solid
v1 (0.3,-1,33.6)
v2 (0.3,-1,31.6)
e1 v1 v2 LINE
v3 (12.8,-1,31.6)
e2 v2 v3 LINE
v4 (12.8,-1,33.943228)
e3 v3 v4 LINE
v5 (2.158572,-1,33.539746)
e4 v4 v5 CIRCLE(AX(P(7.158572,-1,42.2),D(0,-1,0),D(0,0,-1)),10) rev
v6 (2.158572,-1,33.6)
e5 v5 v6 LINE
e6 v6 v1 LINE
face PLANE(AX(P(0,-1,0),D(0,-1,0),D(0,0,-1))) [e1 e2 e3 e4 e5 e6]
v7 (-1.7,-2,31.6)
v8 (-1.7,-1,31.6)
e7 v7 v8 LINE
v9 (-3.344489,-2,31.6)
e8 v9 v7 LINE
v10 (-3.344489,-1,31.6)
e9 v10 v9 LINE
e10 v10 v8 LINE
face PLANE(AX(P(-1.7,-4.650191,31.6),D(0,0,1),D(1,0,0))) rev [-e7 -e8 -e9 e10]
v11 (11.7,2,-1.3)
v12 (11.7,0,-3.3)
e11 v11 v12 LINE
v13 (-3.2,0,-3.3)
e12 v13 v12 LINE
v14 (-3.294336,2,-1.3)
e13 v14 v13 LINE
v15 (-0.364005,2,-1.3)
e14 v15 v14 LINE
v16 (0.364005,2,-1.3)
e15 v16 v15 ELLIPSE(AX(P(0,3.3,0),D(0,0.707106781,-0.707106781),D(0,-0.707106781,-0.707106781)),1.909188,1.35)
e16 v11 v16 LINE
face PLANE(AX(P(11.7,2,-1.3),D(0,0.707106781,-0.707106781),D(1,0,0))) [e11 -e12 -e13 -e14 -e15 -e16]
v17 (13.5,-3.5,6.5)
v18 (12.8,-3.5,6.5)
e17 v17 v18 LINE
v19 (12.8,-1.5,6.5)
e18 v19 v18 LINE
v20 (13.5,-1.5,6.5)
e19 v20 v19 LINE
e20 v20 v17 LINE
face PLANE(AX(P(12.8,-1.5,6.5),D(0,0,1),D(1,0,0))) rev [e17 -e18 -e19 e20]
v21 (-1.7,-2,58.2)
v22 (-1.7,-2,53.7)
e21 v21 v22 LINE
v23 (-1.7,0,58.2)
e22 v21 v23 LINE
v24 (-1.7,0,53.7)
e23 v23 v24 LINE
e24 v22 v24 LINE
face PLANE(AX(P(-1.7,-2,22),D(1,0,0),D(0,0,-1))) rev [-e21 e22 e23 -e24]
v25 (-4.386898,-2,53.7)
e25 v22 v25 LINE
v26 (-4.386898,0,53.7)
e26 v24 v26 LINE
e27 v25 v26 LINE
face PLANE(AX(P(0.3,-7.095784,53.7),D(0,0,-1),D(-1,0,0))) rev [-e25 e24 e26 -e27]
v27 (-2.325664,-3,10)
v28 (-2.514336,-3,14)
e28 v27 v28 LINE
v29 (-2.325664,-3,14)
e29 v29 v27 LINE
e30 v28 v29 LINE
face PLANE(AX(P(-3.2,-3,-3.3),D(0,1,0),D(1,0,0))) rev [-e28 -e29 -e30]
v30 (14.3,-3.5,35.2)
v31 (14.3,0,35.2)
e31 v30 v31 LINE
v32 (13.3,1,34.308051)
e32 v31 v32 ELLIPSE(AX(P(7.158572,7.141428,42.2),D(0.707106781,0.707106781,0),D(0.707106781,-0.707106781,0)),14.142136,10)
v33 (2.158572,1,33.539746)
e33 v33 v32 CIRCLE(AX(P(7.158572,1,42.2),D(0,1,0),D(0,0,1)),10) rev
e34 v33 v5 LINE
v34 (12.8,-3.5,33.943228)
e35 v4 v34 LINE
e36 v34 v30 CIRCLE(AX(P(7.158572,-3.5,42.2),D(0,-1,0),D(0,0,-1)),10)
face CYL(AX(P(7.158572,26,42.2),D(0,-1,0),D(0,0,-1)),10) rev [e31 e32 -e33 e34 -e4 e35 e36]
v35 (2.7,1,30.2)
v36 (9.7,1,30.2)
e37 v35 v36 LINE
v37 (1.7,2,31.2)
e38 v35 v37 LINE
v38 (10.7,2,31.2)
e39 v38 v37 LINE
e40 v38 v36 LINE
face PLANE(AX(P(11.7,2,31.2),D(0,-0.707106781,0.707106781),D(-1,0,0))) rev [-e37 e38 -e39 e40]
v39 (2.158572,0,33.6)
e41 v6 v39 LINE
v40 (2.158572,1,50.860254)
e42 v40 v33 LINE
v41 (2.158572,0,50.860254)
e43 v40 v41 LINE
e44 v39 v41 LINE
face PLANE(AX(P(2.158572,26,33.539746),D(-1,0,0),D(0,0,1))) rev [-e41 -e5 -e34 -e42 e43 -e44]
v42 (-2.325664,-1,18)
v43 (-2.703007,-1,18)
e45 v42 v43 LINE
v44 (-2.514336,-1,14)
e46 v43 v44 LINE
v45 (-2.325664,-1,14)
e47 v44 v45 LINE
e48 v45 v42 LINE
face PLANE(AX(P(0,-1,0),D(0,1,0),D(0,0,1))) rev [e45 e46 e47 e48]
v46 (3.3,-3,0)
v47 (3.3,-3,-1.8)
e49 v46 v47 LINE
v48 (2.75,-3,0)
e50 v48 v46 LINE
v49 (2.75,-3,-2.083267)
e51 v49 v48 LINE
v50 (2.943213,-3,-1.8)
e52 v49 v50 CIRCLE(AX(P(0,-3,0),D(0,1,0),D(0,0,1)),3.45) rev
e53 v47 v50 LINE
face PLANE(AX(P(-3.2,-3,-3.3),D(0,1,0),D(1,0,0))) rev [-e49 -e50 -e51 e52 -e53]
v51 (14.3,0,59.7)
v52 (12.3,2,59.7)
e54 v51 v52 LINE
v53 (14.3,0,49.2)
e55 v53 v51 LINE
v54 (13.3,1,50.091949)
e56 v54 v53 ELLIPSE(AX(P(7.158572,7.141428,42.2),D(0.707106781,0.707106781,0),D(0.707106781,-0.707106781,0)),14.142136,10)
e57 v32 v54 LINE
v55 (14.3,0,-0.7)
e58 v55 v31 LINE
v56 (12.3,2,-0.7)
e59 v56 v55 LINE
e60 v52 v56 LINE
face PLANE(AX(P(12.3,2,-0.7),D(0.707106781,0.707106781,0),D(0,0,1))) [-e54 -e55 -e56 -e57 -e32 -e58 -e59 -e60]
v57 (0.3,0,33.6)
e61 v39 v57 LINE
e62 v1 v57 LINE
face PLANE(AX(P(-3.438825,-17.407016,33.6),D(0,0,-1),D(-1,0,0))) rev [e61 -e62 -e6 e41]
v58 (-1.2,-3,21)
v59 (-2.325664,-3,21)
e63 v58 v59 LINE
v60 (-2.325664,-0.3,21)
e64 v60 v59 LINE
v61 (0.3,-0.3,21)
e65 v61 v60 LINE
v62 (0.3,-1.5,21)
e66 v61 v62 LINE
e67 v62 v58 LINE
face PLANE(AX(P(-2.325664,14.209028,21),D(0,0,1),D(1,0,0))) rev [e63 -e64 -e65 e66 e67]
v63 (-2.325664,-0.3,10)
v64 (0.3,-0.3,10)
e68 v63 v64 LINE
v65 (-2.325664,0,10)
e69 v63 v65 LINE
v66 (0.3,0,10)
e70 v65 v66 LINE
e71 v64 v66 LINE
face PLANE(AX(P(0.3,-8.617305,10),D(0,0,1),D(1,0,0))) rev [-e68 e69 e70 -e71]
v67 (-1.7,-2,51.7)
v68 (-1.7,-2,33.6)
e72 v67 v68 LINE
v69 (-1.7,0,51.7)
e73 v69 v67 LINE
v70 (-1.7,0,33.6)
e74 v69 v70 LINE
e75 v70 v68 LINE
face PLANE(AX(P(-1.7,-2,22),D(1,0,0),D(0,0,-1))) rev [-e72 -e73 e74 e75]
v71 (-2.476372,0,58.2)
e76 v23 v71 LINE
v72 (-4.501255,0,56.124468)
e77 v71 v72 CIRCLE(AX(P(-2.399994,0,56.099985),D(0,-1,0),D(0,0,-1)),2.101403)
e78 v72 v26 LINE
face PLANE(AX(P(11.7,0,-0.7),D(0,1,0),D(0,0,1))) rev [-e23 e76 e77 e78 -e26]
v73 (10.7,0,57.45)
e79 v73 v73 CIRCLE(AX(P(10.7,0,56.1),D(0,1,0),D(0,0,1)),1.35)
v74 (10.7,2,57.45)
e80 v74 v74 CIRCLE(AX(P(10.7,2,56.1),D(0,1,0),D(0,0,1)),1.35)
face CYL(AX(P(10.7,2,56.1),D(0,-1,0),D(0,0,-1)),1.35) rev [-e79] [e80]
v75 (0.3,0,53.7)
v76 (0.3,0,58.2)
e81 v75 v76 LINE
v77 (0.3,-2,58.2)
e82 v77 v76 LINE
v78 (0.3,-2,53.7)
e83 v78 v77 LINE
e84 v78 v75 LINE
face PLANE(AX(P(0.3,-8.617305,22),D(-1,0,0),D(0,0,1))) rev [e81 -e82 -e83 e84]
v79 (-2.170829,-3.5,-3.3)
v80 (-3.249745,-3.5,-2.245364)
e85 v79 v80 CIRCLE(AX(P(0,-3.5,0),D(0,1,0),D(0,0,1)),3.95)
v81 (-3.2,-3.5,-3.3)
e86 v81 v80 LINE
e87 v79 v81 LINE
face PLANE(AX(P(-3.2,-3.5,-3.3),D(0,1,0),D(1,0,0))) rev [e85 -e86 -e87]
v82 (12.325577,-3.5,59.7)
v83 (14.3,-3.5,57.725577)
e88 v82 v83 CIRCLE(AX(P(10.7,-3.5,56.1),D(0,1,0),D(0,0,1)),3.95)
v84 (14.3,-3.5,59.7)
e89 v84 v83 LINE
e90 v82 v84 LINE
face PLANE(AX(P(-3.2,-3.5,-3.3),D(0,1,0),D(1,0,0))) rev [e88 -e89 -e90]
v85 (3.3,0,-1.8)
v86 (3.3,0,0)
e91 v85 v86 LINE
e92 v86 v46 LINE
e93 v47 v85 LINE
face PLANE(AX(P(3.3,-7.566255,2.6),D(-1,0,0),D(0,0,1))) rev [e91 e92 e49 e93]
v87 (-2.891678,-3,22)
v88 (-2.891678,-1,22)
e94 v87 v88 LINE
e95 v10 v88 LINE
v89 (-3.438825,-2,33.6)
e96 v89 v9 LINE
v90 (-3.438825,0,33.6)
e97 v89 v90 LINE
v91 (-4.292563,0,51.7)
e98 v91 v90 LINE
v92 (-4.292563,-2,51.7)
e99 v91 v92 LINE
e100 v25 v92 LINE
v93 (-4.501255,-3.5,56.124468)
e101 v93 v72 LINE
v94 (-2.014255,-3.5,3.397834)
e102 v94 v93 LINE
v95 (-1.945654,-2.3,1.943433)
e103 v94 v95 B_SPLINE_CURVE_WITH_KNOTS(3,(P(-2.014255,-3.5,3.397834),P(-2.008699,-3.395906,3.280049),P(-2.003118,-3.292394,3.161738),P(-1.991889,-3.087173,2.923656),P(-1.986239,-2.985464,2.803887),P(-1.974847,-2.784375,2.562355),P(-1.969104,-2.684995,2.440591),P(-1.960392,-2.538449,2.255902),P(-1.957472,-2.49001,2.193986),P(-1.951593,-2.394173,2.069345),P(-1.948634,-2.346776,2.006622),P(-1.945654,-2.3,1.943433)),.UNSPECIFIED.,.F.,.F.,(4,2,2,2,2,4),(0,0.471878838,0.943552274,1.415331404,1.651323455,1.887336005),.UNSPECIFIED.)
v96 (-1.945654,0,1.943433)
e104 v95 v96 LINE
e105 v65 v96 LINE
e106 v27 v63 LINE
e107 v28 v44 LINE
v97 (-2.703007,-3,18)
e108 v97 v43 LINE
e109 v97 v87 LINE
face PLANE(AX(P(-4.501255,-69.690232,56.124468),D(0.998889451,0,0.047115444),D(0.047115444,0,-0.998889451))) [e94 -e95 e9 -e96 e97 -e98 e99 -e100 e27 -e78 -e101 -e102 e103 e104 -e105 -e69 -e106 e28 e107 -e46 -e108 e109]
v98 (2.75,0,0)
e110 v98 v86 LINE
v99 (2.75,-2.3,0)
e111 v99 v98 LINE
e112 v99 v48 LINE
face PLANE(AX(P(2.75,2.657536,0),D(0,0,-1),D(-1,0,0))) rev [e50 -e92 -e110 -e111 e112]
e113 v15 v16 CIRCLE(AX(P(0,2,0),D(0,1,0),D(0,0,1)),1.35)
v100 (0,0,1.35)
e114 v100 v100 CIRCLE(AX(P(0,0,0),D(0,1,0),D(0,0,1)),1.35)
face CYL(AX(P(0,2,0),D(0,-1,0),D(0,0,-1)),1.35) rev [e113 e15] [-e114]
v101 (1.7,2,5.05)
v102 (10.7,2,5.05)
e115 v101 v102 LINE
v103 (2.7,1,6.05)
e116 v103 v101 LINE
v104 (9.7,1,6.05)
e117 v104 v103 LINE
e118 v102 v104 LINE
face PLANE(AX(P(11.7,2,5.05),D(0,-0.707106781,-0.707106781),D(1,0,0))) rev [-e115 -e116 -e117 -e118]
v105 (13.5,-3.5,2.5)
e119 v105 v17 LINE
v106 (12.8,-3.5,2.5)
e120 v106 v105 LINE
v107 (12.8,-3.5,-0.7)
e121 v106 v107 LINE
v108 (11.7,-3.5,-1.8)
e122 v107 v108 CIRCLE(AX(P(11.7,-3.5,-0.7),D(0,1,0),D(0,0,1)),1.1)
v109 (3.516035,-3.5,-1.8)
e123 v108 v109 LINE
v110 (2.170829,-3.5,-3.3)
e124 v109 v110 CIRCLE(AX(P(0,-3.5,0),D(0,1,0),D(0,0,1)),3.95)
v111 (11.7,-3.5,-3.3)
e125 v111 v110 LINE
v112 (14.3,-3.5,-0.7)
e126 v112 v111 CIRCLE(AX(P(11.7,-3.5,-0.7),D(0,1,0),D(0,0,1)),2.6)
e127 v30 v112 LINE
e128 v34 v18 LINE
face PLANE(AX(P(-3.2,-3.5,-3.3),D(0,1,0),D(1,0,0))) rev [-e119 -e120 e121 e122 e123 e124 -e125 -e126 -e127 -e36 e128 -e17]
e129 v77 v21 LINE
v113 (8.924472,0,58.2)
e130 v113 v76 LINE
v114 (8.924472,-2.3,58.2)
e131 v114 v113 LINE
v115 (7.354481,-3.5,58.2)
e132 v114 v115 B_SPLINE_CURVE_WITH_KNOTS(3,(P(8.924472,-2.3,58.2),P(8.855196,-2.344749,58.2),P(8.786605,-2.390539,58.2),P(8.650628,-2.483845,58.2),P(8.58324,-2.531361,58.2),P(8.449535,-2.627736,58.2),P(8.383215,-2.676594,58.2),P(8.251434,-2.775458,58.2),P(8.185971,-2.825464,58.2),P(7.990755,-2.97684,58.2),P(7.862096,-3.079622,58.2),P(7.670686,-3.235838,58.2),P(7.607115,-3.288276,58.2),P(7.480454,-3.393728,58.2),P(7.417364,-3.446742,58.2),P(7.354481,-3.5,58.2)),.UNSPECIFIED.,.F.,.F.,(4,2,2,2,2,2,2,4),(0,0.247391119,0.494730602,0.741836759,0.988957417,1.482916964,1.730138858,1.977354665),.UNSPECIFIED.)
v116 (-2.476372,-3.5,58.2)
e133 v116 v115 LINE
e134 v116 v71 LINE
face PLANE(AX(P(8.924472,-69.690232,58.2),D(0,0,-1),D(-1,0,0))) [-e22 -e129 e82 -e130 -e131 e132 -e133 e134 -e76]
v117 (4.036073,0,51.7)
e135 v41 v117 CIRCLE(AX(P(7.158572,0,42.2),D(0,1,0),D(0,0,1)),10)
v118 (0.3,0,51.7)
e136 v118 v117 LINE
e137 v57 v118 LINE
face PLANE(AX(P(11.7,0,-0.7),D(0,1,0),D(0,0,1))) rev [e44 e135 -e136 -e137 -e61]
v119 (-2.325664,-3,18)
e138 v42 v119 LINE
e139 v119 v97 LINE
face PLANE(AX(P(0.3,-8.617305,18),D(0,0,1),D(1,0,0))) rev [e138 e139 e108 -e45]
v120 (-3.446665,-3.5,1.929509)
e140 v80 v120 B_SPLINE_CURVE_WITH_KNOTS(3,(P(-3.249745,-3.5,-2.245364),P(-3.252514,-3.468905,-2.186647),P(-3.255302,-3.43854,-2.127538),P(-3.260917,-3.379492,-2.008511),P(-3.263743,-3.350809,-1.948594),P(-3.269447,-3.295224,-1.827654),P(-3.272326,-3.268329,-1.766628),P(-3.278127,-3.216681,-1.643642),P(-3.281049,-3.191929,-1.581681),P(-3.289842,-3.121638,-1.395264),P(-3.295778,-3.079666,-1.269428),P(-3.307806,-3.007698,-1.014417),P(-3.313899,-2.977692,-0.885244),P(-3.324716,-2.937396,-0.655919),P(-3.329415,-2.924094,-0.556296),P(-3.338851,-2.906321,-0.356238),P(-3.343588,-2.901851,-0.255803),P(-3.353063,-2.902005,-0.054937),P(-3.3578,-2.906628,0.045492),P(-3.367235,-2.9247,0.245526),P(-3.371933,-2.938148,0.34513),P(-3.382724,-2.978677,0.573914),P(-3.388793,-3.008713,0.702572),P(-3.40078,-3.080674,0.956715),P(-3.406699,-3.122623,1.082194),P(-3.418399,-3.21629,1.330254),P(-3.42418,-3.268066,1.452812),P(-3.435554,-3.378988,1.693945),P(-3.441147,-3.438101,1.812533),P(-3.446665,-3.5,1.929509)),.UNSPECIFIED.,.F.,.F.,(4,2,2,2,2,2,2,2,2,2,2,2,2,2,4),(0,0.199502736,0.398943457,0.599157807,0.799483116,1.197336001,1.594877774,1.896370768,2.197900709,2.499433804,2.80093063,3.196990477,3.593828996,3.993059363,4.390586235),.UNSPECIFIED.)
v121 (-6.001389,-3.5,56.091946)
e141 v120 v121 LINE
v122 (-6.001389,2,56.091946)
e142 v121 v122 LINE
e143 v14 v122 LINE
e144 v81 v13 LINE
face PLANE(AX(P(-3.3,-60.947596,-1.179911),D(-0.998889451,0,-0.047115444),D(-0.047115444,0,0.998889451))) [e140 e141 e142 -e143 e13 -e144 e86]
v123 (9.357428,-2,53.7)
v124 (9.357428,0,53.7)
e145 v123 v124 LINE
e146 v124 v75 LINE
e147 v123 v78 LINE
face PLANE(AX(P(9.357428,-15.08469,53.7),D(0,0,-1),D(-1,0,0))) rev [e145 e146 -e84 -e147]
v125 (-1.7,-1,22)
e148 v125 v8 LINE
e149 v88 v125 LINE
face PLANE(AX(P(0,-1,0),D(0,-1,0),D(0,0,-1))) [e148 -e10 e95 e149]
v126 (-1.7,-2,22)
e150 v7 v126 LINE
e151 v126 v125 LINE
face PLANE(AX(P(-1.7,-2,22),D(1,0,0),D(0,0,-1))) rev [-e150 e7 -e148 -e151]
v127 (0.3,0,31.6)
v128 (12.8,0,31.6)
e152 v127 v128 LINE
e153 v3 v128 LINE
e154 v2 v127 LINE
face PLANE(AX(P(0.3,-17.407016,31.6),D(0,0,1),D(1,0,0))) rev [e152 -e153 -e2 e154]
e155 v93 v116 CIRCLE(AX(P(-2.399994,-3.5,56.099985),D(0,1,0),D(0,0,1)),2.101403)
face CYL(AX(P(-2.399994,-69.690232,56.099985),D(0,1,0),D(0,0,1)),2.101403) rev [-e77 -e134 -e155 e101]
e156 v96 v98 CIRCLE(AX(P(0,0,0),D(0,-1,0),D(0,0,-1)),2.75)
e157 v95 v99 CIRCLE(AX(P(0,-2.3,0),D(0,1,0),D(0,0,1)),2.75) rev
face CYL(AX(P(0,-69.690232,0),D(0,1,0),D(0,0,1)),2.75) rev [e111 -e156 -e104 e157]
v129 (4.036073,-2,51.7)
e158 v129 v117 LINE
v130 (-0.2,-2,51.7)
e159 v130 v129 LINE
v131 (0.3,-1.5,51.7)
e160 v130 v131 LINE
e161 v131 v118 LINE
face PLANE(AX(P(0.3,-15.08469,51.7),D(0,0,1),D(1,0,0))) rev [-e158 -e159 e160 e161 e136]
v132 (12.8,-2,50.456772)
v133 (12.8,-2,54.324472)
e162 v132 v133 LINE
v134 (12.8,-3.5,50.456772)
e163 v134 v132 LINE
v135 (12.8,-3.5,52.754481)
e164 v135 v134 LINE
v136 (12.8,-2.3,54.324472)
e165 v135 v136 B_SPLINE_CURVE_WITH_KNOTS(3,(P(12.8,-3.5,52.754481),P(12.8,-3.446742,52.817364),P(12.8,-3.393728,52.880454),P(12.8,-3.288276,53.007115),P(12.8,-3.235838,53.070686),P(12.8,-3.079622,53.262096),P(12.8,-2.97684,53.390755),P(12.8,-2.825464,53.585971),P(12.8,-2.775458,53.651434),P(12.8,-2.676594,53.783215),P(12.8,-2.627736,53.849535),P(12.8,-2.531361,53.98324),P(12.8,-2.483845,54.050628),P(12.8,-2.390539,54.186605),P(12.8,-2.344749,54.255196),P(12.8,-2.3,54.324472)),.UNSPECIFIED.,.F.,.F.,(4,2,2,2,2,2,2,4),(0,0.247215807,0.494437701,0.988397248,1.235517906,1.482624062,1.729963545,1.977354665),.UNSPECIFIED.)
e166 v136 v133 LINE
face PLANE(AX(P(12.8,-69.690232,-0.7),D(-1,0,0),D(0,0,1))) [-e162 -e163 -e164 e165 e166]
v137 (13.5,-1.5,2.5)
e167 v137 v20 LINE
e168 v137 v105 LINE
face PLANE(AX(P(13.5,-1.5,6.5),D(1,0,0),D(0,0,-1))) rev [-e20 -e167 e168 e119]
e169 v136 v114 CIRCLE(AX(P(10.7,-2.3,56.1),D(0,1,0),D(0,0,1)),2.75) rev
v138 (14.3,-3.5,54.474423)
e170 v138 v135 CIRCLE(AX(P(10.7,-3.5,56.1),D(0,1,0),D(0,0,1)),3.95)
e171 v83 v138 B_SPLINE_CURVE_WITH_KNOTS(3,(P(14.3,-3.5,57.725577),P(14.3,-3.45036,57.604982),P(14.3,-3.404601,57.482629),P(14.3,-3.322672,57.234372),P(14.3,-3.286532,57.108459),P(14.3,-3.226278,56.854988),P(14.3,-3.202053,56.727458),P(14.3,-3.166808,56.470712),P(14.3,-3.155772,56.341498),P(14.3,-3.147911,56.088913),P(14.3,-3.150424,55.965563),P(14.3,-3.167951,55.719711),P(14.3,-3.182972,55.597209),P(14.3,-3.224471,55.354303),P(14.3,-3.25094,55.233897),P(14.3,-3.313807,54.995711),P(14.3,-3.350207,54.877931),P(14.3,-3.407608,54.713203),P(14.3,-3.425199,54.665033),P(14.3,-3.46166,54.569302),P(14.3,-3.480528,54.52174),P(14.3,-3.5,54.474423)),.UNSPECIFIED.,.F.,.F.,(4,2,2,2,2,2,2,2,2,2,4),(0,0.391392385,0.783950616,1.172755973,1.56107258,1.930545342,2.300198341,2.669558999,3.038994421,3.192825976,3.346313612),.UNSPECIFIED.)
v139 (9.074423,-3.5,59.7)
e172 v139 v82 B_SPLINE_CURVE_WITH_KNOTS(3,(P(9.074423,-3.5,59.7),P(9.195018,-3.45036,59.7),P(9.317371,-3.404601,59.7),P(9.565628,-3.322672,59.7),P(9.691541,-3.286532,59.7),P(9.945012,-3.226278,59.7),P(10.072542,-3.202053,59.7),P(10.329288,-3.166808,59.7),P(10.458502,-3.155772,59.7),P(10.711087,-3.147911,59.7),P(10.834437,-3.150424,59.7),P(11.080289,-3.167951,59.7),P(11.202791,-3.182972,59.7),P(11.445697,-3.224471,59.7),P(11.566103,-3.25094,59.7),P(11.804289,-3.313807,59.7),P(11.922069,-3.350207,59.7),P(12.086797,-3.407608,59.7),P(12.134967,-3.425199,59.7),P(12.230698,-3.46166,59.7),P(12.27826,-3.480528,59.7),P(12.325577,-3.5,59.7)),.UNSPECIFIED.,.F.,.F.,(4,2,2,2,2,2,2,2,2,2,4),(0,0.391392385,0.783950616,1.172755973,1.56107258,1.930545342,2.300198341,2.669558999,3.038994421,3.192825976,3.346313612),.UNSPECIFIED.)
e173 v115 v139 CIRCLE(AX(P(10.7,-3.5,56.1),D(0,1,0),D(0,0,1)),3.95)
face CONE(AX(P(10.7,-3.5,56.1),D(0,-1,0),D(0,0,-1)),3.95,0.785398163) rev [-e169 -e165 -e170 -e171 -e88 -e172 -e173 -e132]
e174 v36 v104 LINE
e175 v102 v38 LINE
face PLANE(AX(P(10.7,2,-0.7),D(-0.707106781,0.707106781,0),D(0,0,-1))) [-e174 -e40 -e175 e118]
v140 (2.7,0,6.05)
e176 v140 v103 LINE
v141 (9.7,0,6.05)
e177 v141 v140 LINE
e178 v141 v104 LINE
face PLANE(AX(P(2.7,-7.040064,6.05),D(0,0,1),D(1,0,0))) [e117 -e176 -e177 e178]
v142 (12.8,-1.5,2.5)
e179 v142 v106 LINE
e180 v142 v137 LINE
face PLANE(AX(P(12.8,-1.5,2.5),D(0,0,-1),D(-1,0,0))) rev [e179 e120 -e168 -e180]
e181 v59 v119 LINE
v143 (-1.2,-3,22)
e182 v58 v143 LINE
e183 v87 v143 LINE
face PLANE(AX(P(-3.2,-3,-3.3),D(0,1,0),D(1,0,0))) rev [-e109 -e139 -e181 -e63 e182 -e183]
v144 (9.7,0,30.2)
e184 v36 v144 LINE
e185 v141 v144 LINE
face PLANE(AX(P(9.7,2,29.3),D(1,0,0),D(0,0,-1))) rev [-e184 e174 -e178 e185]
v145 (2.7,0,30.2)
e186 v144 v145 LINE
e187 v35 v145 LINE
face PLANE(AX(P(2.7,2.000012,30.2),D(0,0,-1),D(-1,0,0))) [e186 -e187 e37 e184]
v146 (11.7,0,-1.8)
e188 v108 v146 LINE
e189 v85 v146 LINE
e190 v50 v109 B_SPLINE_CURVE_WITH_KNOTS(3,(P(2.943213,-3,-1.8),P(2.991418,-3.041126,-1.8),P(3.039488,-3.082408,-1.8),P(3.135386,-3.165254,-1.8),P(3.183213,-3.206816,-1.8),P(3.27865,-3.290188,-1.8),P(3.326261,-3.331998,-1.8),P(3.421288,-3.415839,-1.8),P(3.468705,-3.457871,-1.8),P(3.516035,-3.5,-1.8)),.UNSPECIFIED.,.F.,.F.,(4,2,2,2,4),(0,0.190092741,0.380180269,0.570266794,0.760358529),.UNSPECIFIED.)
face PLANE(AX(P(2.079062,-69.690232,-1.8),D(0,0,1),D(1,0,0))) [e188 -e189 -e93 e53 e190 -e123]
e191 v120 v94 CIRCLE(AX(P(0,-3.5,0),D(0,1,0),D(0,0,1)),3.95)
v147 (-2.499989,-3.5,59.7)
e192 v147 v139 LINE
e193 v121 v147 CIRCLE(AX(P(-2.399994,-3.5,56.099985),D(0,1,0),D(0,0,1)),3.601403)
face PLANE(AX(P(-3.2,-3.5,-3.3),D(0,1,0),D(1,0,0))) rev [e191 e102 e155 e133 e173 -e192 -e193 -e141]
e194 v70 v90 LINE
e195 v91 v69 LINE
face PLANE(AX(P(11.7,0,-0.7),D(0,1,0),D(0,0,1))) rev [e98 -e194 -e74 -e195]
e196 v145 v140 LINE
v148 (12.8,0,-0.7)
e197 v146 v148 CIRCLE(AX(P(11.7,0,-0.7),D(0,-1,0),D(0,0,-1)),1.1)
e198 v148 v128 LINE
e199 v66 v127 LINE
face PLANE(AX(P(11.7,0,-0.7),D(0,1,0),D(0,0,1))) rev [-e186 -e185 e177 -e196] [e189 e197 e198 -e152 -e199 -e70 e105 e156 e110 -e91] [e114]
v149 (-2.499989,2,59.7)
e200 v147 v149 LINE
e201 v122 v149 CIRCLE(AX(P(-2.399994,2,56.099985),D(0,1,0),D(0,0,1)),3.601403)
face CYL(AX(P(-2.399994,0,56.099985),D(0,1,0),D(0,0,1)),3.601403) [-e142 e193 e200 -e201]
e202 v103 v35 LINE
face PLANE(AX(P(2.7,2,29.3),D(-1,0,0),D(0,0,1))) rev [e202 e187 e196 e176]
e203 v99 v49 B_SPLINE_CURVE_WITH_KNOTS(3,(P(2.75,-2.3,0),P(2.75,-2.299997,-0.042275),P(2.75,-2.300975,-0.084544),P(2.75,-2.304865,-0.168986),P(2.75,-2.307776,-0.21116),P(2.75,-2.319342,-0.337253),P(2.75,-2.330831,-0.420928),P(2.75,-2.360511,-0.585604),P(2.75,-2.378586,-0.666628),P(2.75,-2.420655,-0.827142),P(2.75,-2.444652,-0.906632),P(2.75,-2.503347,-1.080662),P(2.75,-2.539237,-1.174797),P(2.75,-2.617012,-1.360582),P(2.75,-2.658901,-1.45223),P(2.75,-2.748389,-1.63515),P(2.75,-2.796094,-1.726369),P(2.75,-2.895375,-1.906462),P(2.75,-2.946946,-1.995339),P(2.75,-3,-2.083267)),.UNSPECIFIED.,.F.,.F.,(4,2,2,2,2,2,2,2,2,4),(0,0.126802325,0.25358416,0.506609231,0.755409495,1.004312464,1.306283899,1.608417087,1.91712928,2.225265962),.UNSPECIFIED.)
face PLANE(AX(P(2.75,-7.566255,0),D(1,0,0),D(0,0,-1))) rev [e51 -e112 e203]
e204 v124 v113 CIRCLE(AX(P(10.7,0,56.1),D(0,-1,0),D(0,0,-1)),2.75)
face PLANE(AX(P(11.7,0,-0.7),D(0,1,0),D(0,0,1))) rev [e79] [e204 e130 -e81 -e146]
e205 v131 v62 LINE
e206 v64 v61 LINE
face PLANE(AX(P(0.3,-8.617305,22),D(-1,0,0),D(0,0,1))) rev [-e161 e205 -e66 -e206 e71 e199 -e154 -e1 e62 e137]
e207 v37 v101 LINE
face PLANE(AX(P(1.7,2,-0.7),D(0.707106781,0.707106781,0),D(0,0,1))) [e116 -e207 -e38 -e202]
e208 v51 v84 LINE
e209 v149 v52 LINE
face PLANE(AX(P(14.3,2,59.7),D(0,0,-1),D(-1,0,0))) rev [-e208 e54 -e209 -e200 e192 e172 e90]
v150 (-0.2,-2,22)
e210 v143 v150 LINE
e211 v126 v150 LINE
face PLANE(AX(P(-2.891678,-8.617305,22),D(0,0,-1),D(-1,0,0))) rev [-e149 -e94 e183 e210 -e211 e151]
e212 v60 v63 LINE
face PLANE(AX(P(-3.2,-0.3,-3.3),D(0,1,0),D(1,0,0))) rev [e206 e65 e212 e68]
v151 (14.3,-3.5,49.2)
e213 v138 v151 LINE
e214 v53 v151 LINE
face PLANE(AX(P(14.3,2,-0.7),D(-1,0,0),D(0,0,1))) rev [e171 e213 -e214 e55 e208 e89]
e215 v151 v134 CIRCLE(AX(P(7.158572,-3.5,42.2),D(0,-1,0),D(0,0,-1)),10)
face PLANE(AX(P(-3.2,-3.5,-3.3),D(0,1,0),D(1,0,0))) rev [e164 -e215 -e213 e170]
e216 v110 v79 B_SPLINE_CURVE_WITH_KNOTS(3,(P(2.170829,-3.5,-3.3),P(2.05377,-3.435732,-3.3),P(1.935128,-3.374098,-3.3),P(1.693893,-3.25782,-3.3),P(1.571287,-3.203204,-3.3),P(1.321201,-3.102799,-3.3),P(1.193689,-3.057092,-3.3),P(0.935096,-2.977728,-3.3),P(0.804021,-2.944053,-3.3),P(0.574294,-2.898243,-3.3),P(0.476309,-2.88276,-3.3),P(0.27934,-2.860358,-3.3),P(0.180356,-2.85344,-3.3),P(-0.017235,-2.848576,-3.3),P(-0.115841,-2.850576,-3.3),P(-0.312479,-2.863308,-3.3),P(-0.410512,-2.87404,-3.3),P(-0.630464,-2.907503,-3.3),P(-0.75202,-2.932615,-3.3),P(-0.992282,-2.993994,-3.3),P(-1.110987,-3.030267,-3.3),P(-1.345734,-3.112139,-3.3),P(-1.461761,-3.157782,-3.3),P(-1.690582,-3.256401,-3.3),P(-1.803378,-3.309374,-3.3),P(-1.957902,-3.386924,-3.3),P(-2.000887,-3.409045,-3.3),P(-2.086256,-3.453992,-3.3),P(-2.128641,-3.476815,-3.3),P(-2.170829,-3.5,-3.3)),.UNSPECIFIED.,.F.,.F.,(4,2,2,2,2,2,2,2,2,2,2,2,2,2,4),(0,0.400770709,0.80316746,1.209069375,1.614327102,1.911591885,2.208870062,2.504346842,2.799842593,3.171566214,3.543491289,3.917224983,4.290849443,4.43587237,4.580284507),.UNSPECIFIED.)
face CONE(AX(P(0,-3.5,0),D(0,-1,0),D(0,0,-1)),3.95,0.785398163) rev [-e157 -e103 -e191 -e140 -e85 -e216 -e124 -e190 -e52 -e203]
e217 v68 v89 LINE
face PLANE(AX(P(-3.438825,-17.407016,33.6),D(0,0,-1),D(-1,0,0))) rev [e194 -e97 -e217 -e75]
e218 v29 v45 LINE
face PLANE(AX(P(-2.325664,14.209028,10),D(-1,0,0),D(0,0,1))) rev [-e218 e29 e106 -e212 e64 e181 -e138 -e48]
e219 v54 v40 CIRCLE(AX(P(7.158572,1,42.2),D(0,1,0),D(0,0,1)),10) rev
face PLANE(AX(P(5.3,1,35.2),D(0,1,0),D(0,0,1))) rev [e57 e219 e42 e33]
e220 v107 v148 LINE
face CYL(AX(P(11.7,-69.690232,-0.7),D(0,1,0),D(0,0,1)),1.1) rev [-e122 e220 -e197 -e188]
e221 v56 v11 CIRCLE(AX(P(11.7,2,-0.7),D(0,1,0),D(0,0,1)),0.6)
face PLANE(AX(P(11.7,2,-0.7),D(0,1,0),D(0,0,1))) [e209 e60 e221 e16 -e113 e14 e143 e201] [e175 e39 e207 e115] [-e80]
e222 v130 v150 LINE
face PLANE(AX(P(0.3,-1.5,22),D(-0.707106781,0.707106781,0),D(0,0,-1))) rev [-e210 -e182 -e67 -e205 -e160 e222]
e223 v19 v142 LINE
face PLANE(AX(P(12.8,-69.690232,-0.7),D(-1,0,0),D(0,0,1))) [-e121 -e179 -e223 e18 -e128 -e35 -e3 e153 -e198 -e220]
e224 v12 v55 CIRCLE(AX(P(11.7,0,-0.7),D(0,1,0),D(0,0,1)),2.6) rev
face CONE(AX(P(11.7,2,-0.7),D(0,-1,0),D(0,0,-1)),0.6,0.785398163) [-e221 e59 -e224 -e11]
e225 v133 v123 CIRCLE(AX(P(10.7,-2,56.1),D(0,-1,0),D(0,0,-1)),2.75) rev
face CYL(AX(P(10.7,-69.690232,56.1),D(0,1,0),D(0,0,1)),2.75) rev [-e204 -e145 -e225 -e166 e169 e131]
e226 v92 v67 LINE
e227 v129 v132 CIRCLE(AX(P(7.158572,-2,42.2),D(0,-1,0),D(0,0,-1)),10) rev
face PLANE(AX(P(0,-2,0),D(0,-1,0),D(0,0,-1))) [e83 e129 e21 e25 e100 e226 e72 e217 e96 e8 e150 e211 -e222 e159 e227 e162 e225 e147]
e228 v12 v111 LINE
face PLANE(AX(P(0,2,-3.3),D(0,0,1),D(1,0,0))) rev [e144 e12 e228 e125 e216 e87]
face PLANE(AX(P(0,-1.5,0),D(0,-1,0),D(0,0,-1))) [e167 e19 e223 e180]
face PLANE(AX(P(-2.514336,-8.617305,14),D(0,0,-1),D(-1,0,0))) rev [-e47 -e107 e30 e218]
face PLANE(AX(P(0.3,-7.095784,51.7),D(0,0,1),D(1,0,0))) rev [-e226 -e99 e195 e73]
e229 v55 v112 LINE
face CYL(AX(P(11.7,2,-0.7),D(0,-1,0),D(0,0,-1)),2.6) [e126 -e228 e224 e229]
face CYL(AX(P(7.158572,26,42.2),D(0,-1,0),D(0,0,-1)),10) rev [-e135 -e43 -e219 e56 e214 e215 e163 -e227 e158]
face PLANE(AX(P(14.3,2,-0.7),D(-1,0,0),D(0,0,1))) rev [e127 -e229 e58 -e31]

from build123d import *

# Parameters (mm, degrees)
SKETCH_1_R                      = 1.35
EXTRUDE_1_DEPTH                 = 2
EXTRUDE_2_DEPTH                 = 2
CUT_EXTRUDE_1_DEPTH             = 62.421331799
CUT_EXTRUDE_1_DEPTH_BACK        = 62.421331799
EXTRUDE_START                   = 3.5
EXTRUDE_3_DEPTH                 = 3.5
SKETCH_5_W                      = 14
SKETCH_5_H                      = 4.5
CUT_EXTRUDE_2_DEPTH             = 9
CUT_EXTRUDE_3_REACH             = 63.635
SKETCH_7_W                      = 7
SKETCH_7_H                      = 24
CUT_EXTRUDE_4_DEPTH             = 62.488454201
EXTRUDE_4_DEPTH                 = 3
EXTRUDE_START_2                 = 3
EXTRUDE_5_DEPTH                 = 3
CHAMFER_2_SIZE                  = 1.5
EXTRUDE_6_DEPTH                 = 1
EXTRUDE_START_3                 = 1
EXTRUDE_7_DEPTH                 = 1
CHAMFER_3_SIZE                  = 1.2
CUT_EXTRUDE_6_REACH             = 63.635
SKETCH_13_W                     = 7
SKETCH_13_H                     = 0.9
CUT_EXTRUDE_6_DIRECTION_2_DEPTH = 62.634649346
SKETCH_14_W                     = 7
SKETCH_14_H                     = 0.75
EXTRUDE_8_DEPTH                 = 2
CHAMFER_1_SIZE                  = 1
SKETCH_15_W                     = 2.625664416
SKETCH_15_H                     = 11
CUT_EXTRUDE_7_DEPTH             = 2.7
CUT_EXTRUDE_START               = -3
SKETCH_16_W                     = 0.55
SKETCH_16_H                     = 2.6
CUT_EXTRUDE_8_DEPTH             = 3
SKETCH_17_W                     = 0.7
SKETCH_17_H                     = 4
CUT_EXTRUDE_9_DEPTH             = 2
SKETCH_18_W                     = 2
SKETCH_18_H                     = 36.2
EXTRUDE_9_DEPTH                 = 2
EXTRUDE_START_4                 = 2
EXTRUDE_10_DEPTH                = 2
SKETCH_20_W                     = 4.68689843
SKETCH_20_H                     = 2
EXTRUDE_11_DEPTH                = 2
SKETCH_21_W                     = 1.738825119
SKETCH_21_H                     = 2
EXTRUDE_12_DEPTH                = 1
CUT_EXTRUDE_10_DEPTH            = 29.7
CHAMFER_4_SIZE                  = 2


with BuildPart() as part:
    # 草图1 → 凸台-拉伸1 (new body)
    with BuildSketch(Plane(origin=(0, 0, 0), x_dir=(1, 0, 0), z_dir=(0, 1, 0))):
        with BuildLine():
            Line((0, 3.3), (11.7, 3.3))
            ThreePointArc((11.7, 3.3), (13.538477631, 2.538477631), (14.3, 0.7))
            Line((14.3, 0.7), (14.3, -59.7))
            Line((14.3, -59.7), (-3.3, -59.7))
            Line((-3.3, -59.7), (-3.3, 0))
            Line((-3.3, 0), (-3.3, 3.3))
            Line((-3.3, 3.3), (0, 3.3))
        make_face()
        with Locations(Location((0, 0, 0), (0, 0, 270))):
            Circle(SKETCH_1_R, mode=Mode.SUBTRACT)
        with Locations(Location((10.7, -56.1, 0), (0, 0, 270))):
            Circle(SKETCH_1_R, mode=Mode.SUBTRACT)
    extrude(amount=EXTRUDE_1_DEPTH)

    # 草图2 → 凸台-拉伸2 (add)
    with BuildSketch(Plane(origin=(0, 2, 0), x_dir=(1, 0, 0), z_dir=(0, 1, 0))):
        Polygon((-3.3, 1.179910787), (-6.171573065, -59.7), (-3.3, -59.7), align=None)
    extrude(amount=-EXTRUDE_2_DEPTH)

    # 草图3 → 切除-拉伸1 (cut, two sides: drawn at the far end of the back side and taken through both)
    with BuildSketch(Plane(origin=(0, 2, 0), x_dir=(1, 0, 0), z_dir=(0, 1, 0)).offset(-CUT_EXTRUDE_1_DEPTH_BACK)):
        Polygon((-3.3, 3.3), (-3.3, 1.179910787), (-3.2, 3.3), align=None)
        with BuildLine():
            ThreePointArc((-2.499988961, -59.7), (-4.984483511, -58.608076588), (-6.001389, -56.091946))
            Line((-6.001389, -56.091946), (-6.171573065, -59.7))
            Line((-6.171573065, -59.7), (-2.499988961, -59.7))
        make_face()
    extrude(amount=CUT_EXTRUDE_1_DEPTH + CUT_EXTRUDE_1_DEPTH_BACK, mode=Mode.SUBTRACT)

    # 草图4 → 凸台-拉伸3 (add)
    with BuildSketch(Plane.XZ.offset(EXTRUDE_START)):
        with BuildLine():
            Line((-6.001389, 56.091946), (-3.2, -3.3))
            Line((-3.2, -3.3), (11.7, -3.3))
            ThreePointArc((11.7, -3.3), (13.538477631, -2.538477631), (14.3, -0.7))
            Line((14.3, -0.7), (14.3, 59.7))
            Line((14.3, 59.7), (-2.499988961, 59.7))
            ThreePointArc((-2.499988961, 59.7), (-4.984483511, 58.608076588), (-6.001389, 56.091946))
        make_face()
        with BuildLine():
            Line((12.8, -0.7), (12.8, 54.32447191))
            ThreePointArc((12.8, 54.32447191), (12.644543648, 58.044543648), (8.92447191, 58.2))
            Line((8.92447191, 58.2), (-2.476371899, 58.2))
            ThreePointArc((-2.476371899, 58.2), (-3.904150356, 57.567435732), (-4.501255338, 56.124468472))
            Line((-4.501255338, 56.124468472), (-1.945653662, 1.943433001))
            ThreePointArc((-1.945653662, 1.943433001), (-1.872904729, -2.013635488), (2.079062289, -1.8))
            Line((2.079062289, -1.8), (11.7, -1.8))
            ThreePointArc((11.7, -1.8), (12.477817459, -1.477817459), (12.8, -0.7))
        make_face(mode=Mode.SUBTRACT)
    extrude(amount=-EXTRUDE_3_DEPTH)

    # 草图5 → 切除-拉伸2 (cut)
    with BuildSketch(Plane(origin=(14.3, 0, 0), x_dir=(0, 0, -1), z_dir=(1, 0, 0))):
        with Locations((-42.2, -1.25)):
            Rectangle(SKETCH_5_W, SKETCH_5_H)
    extrude(amount=-CUT_EXTRUDE_2_DEPTH, mode=Mode.SUBTRACT)

    # 切除-拉伸3: up to this face of the body (flat: up to its plane)
    cut_extrude_3_end = Plane(part.part.faces().sort_by_distance((9.8, 1, 42.2))[0])
    # 草图6 → 切除-拉伸3 (cut, up to the picked face)
    with BuildSketch(Plane.XZ.offset(3.5), mode=Mode.PRIVATE) as cut_extrude_3_sk1:
        with BuildLine():
            Line((2.158571571, 33.539745962), (2.158571571, 50.860254038))
            ThreePointArc((2.158571571, 50.860254038), (17.158571571, 42.2), (2.158571571, 33.539745962))
        make_face()
    cut_extrude_3_tool1 = split(extrude(cut_extrude_3_sk1.sketch, amount=-CUT_EXTRUDE_3_REACH, mode=Mode.PRIVATE), bisect_by=cut_extrude_3_end, keep=Keep.BOTH, mode=Mode.PRIVATE)
    add(cut_extrude_3_tool1.solids().sort_by(Axis((8.87184, -3.5, 42.2), (0, 1, 0)))[0], mode=Mode.SUBTRACT)

    # 草图7 → 切除-拉伸4 (cut, through all)
    with BuildSketch(Plane.XZ):
        with Locations((6.2, 17.3)):
            Rectangle(SKETCH_7_W, SKETCH_7_H)
    extrude(amount=-CUT_EXTRUDE_4_DEPTH, mode=Mode.SUBTRACT)

    # 草图8 → 凸台-拉伸4 (add)
    with BuildSketch(Plane.XZ):
        Polygon((-2.891678333, 22), (0.3, 22), (0.3, 18), (-2.703007027, 18), align=None)
        Polygon((-2.514335721, 14), (0.3, 14), (0.3, 10), (-2.325664416, 10), align=None)
    extrude(amount=EXTRUDE_4_DEPTH)

    # 草图9 → 凸台-拉伸5 (add)
    with BuildSketch(Plane.XZ.offset(EXTRUDE_START_2)):
        with BuildLine():
            Line((2.75, 0), (2.75, 2.6))
            Line((2.75, 2.6), (3.3, 2.6))
            Line((3.3, 2.6), (3.3, -1.8))
            Line((3.3, -1.8), (2.079062289, -1.8))
            ThreePointArc((2.079062289, -1.8), (2.576812109, -0.960489122), (2.75, 0))
        make_face()
    extrude(amount=-EXTRUDE_5_DEPTH)

    # 倒角2
    chamfer_2_edges = [part.edges().sort_by_distance(p)[0] for p in [
        (0.3, -3, 20),
        (0.3, -3, 12),
        (3.025, -3, 2.6),
    ]]
    chamfer(chamfer_2_edges, length=CHAMFER_2_SIZE)

    # 草图10 → 凸台-拉伸6 (add)
    with BuildSketch(Plane.XZ):
        Polygon((0.3, 22), (0.3, 31.6), (-3.344489466, 31.6), (-2.891678333, 22), align=None)
        Polygon((0.3, 18), (0.3, 14), (-2.514335721, 14), (-2.703007027, 18), align=None)
    extrude(amount=EXTRUDE_6_DEPTH)

    # 草图11 → 凸台-拉伸7 (add)
    with BuildSketch(Plane.XZ.offset(EXTRUDE_START_3)):
        with BuildLine():
            Line((0.3, 31.6), (12.8, 31.6))
            Line((12.8, 31.6), (12.8, 33.943227914))
            ThreePointArc((12.8, 33.943227914), (7.537460775, 32.207180429), (2.158571571, 33.539745962))
            Line((2.158571571, 33.539745962), (2.158571571, 33.6))
            Line((2.158571571, 33.6), (-3.438825119, 33.6))
            Line((-3.438825119, 33.6), (-3.344489466, 31.6))
            Line((-3.344489466, 31.6), (0.3, 31.6))
        make_face()
    extrude(amount=-EXTRUDE_7_DEPTH)

    # 倒角3
    # the kernel refuses this chamfer: 1.2 mm, written as the material it takes off along each edge
    with BuildSketch(Plane(origin=(10.7, -3.5, 56.1), x_dir=(-0.25212926598993896, 0, -0.9676935637025672), z_dir=(-0.9676935637025672, 0, 0.25212926598993896))) as chamfer_3_piece_1:
        Polygon((2.75, -CHAMFER_3_SIZE), (2.75 + CHAMFER_3_SIZE, 0), (2.75, 0), align=None)
    revolve(axis=Axis((10.7, -3.5, 56.1), (0, -1, 0)), revolution_arc=299.20709405, mode=Mode.SUBTRACT)
    with BuildSketch(Plane(origin=(0, -3.5, 0), x_dir=(0.3317021922572173, 0, 0.9433841506256908), z_dir=(0.9433841506256908, 0, -0.3317021922572173))) as chamfer_3_piece_2_section:
        Polygon((2.75, -CHAMFER_3_SIZE), (2.75 + CHAMFER_3_SIZE, 0), (2.75, 0), align=None)
    chamfer_3_piece_2 = revolve(axis=Axis((0, -3.5, 0), (0, -1, 0)), revolution_arc=312.891771357, mode=Mode.PRIVATE)
    chamfer_3_piece_2 = split(chamfer_3_piece_2, bisect_by=Plane(origin=(2.75, -2.813189382, 1.829031727), z_dir=(-1, 0, 0)), keep=Keep.TOP, mode=Mode.PRIVATE)
    add(chamfer_3_piece_2, mode=Mode.SUBTRACT)
    with BuildSketch(Plane(origin=(0, -3.5, 0), x_dir=(0.3317021922572173, 0, 0.9433841506256908), z_dir=(0.9433841506256908, 0, -0.3317021922572173))) as chamfer_3_piece_3_section:
        Polygon((2.75, -CHAMFER_3_SIZE), (2.75 + CHAMFER_3_SIZE, 0), (2.75, 0), align=None)
    chamfer_3_piece_3 = revolve(axis=Axis((0, -3.5, 0), (0, -1, 0)), revolution_arc=312.891771357, mode=Mode.PRIVATE)
    chamfer_3_piece_3 = split(chamfer_3_piece_3, bisect_by=Plane(origin=(2.94239335, -3, -2.084958932), z_dir=(0, -1, 0)), keep=Keep.TOP, mode=Mode.PRIVATE)
    add(chamfer_3_piece_3, mode=Mode.SUBTRACT)

    # 草图13 → 切除-拉伸6 (cut, up to next)
    with BuildSketch(Plane(origin=(0, 2, 0), x_dir=(1, 0, 0), z_dir=(0, 1, 0)), mode=Mode.PRIVATE) as cut_extrude_6_sk1:
        with Locations((6.2, -29.75)):
            Rectangle(SKETCH_13_W, SKETCH_13_H)
    cut_extrude_6_tool1 = extrude(cut_extrude_6_sk1.sketch, amount=-CUT_EXTRUDE_6_REACH, mode=Mode.PRIVATE) & part.part
    add(cut_extrude_6_tool1.solids().sort_by_distance((6.2, 2, 29.75))[0], mode=Mode.SUBTRACT)

    # 草图13 → 切除-拉伸6 direction 2 (cut)
    with BuildSketch(Plane(origin=(0, 2, 0), x_dir=(1, 0, 0), z_dir=(0, 1, 0))):
        with Locations((6.2, -29.75)):
            Rectangle(SKETCH_13_W, SKETCH_13_H)
    extrude(amount=CUT_EXTRUDE_6_DIRECTION_2_DEPTH, mode=Mode.SUBTRACT)

    # 草图14 → 凸台-拉伸8 (add)
    with BuildSketch(Plane(origin=(0, 2, 0), x_dir=(1, 0, 0), z_dir=(0, 1, 0))):
        with Locations((6.2, -5.675)):
            Rectangle(SKETCH_14_W, SKETCH_14_H)
    extrude(amount=-EXTRUDE_8_DEPTH)

    # 倒角1
    chamfer_1_edges = [part.edges().sort_by_distance(p)[0] for p in [
        (2.7, 2, 18.125),
        (6.2, 2, 30.2),
        (9.7, 2, 18.125),
        (6.2, 2, 6.05),
    ]]
    chamfer(chamfer_1_edges, length=CHAMFER_1_SIZE)

    # 草图15 → 切除-拉伸7 (cut)
    with BuildSketch(Plane.XZ.offset(3)):
        with Locations((-1.012832208, 15.5)):
            Rectangle(SKETCH_15_W, SKETCH_15_H)
    extrude(amount=-CUT_EXTRUDE_7_DEPTH, mode=Mode.SUBTRACT)

    # 草图16 → 切除-拉伸8 (cut)
    with BuildSketch(Plane.XZ.offset(3).offset(CUT_EXTRUDE_START)):
        with Locations((3.025, 1.3)):
            Rectangle(SKETCH_16_W, SKETCH_16_H)
    extrude(amount=CUT_EXTRUDE_8_DEPTH, mode=Mode.SUBTRACT)

    # 草图17 → 切除-拉伸9 (cut)
    with BuildSketch(Plane.XZ.offset(3.5)):
        with Locations((13.15, 4.5)):
            Rectangle(SKETCH_17_W, SKETCH_17_H)
    extrude(amount=-CUT_EXTRUDE_9_DEPTH, mode=Mode.SUBTRACT)

    # 草图18 → 凸台-拉伸9 (add)
    with BuildSketch(Plane.XZ):
        with Locations((-0.7, 40.1)):
            Rectangle(SKETCH_18_W, SKETCH_18_H)
    extrude(amount=EXTRUDE_9_DEPTH)

    # 草图19 → 凸台-拉伸10 (add)
    with BuildSketch(Plane.XZ.offset(EXTRUDE_START_4)):
        with BuildLine():
            Line((9.357427842, 53.7), (0.3, 53.7))
            Line((0.3, 53.7), (0.3, 51.7))
            Line((0.3, 51.7), (4.036072572, 51.7))
            ThreePointArc((4.036072572, 51.7), (8.563084042, 52.100875957), (12.8, 50.456772086))
            Line((12.8, 50.456772086), (12.8, 54.32447191))
            ThreePointArc((12.8, 54.32447191), (11.190831463, 53.394157345), (9.357427842, 53.7))
        make_face()
    extrude(amount=-EXTRUDE_10_DEPTH)

    # 草图20 → 凸台-拉伸11 (add)
    with BuildSketch(Plane.XZ):
        with Locations((-2.043449215, 52.7)):
            Rectangle(SKETCH_20_W, SKETCH_20_H)
    extrude(amount=EXTRUDE_11_DEPTH)

    # 草图21 → 凸台-拉伸12 (add)
    with BuildSketch(Plane.XZ.offset(1)):
        with Locations((-2.569412559, 32.6)):
            Rectangle(SKETCH_21_W, SKETCH_21_H)
    extrude(amount=EXTRUDE_12_DEPTH)

    # 草图22 → 切除-拉伸10 (cut)
    with BuildSketch(Plane(origin=(0, 0, 22), x_dir=(-1, 0, 0), z_dir=(0, 0, -1))):
        Polygon((0.2, -2), (-0.3, -1.5), (-0.3, -2), align=None)
    extrude(amount=-CUT_EXTRUDE_10_DEPTH, mode=Mode.SUBTRACT)

    # 倒角4
    # the kernel refuses this chamfer: 2 mm, written as the material it takes off along each edge
    with BuildSketch(Plane(origin=(-8.343365976, 2, -3.3), x_dir=(0, 0.02749587661058627, 0.9996219169112968), z_dir=(1, 0, 0))) as chamfer_4_piece_1:
        Polygon((CHAMFER_4_SIZE * 0.999621916911, CHAMFER_4_SIZE * 0.0274958766106), (-CHAMFER_4_SIZE * 0.0274958766106, CHAMFER_4_SIZE * 0.999621916911), (0, 0), align=None)
    extrude(amount=20.043365976, mode=Mode.SUBTRACT)
    with BuildSketch(Plane(origin=(11.7, 2, -0.7), x_dir=(0, 0, -1), z_dir=(-1, 0, 0))) as chamfer_4_piece_2:
        Polygon((2.6 - CHAMFER_4_SIZE, 0), (2.6, CHAMFER_4_SIZE), (2.6, 0), align=None)
    revolve(axis=Axis((11.7, 2, -0.7), (0, -1, 0)), revolution_arc=90, mode=Mode.SUBTRACT)
    with BuildSketch(Plane(origin=(14.3, 2, -0.7), x_dir=(-0.9996219169112968, 0.02749587661058627, 0), z_dir=(0, 0, 1))) as chamfer_4_piece_3:
        Polygon((CHAMFER_4_SIZE * 0.999621916911, CHAMFER_4_SIZE * 0.0274958766106), (-CHAMFER_4_SIZE * 0.0274958766106, CHAMFER_4_SIZE * 0.999621916911), (0, 0), align=None)
    extrude(amount=65.543365976, mode=Mode.SUBTRACT)


solid = part.part
